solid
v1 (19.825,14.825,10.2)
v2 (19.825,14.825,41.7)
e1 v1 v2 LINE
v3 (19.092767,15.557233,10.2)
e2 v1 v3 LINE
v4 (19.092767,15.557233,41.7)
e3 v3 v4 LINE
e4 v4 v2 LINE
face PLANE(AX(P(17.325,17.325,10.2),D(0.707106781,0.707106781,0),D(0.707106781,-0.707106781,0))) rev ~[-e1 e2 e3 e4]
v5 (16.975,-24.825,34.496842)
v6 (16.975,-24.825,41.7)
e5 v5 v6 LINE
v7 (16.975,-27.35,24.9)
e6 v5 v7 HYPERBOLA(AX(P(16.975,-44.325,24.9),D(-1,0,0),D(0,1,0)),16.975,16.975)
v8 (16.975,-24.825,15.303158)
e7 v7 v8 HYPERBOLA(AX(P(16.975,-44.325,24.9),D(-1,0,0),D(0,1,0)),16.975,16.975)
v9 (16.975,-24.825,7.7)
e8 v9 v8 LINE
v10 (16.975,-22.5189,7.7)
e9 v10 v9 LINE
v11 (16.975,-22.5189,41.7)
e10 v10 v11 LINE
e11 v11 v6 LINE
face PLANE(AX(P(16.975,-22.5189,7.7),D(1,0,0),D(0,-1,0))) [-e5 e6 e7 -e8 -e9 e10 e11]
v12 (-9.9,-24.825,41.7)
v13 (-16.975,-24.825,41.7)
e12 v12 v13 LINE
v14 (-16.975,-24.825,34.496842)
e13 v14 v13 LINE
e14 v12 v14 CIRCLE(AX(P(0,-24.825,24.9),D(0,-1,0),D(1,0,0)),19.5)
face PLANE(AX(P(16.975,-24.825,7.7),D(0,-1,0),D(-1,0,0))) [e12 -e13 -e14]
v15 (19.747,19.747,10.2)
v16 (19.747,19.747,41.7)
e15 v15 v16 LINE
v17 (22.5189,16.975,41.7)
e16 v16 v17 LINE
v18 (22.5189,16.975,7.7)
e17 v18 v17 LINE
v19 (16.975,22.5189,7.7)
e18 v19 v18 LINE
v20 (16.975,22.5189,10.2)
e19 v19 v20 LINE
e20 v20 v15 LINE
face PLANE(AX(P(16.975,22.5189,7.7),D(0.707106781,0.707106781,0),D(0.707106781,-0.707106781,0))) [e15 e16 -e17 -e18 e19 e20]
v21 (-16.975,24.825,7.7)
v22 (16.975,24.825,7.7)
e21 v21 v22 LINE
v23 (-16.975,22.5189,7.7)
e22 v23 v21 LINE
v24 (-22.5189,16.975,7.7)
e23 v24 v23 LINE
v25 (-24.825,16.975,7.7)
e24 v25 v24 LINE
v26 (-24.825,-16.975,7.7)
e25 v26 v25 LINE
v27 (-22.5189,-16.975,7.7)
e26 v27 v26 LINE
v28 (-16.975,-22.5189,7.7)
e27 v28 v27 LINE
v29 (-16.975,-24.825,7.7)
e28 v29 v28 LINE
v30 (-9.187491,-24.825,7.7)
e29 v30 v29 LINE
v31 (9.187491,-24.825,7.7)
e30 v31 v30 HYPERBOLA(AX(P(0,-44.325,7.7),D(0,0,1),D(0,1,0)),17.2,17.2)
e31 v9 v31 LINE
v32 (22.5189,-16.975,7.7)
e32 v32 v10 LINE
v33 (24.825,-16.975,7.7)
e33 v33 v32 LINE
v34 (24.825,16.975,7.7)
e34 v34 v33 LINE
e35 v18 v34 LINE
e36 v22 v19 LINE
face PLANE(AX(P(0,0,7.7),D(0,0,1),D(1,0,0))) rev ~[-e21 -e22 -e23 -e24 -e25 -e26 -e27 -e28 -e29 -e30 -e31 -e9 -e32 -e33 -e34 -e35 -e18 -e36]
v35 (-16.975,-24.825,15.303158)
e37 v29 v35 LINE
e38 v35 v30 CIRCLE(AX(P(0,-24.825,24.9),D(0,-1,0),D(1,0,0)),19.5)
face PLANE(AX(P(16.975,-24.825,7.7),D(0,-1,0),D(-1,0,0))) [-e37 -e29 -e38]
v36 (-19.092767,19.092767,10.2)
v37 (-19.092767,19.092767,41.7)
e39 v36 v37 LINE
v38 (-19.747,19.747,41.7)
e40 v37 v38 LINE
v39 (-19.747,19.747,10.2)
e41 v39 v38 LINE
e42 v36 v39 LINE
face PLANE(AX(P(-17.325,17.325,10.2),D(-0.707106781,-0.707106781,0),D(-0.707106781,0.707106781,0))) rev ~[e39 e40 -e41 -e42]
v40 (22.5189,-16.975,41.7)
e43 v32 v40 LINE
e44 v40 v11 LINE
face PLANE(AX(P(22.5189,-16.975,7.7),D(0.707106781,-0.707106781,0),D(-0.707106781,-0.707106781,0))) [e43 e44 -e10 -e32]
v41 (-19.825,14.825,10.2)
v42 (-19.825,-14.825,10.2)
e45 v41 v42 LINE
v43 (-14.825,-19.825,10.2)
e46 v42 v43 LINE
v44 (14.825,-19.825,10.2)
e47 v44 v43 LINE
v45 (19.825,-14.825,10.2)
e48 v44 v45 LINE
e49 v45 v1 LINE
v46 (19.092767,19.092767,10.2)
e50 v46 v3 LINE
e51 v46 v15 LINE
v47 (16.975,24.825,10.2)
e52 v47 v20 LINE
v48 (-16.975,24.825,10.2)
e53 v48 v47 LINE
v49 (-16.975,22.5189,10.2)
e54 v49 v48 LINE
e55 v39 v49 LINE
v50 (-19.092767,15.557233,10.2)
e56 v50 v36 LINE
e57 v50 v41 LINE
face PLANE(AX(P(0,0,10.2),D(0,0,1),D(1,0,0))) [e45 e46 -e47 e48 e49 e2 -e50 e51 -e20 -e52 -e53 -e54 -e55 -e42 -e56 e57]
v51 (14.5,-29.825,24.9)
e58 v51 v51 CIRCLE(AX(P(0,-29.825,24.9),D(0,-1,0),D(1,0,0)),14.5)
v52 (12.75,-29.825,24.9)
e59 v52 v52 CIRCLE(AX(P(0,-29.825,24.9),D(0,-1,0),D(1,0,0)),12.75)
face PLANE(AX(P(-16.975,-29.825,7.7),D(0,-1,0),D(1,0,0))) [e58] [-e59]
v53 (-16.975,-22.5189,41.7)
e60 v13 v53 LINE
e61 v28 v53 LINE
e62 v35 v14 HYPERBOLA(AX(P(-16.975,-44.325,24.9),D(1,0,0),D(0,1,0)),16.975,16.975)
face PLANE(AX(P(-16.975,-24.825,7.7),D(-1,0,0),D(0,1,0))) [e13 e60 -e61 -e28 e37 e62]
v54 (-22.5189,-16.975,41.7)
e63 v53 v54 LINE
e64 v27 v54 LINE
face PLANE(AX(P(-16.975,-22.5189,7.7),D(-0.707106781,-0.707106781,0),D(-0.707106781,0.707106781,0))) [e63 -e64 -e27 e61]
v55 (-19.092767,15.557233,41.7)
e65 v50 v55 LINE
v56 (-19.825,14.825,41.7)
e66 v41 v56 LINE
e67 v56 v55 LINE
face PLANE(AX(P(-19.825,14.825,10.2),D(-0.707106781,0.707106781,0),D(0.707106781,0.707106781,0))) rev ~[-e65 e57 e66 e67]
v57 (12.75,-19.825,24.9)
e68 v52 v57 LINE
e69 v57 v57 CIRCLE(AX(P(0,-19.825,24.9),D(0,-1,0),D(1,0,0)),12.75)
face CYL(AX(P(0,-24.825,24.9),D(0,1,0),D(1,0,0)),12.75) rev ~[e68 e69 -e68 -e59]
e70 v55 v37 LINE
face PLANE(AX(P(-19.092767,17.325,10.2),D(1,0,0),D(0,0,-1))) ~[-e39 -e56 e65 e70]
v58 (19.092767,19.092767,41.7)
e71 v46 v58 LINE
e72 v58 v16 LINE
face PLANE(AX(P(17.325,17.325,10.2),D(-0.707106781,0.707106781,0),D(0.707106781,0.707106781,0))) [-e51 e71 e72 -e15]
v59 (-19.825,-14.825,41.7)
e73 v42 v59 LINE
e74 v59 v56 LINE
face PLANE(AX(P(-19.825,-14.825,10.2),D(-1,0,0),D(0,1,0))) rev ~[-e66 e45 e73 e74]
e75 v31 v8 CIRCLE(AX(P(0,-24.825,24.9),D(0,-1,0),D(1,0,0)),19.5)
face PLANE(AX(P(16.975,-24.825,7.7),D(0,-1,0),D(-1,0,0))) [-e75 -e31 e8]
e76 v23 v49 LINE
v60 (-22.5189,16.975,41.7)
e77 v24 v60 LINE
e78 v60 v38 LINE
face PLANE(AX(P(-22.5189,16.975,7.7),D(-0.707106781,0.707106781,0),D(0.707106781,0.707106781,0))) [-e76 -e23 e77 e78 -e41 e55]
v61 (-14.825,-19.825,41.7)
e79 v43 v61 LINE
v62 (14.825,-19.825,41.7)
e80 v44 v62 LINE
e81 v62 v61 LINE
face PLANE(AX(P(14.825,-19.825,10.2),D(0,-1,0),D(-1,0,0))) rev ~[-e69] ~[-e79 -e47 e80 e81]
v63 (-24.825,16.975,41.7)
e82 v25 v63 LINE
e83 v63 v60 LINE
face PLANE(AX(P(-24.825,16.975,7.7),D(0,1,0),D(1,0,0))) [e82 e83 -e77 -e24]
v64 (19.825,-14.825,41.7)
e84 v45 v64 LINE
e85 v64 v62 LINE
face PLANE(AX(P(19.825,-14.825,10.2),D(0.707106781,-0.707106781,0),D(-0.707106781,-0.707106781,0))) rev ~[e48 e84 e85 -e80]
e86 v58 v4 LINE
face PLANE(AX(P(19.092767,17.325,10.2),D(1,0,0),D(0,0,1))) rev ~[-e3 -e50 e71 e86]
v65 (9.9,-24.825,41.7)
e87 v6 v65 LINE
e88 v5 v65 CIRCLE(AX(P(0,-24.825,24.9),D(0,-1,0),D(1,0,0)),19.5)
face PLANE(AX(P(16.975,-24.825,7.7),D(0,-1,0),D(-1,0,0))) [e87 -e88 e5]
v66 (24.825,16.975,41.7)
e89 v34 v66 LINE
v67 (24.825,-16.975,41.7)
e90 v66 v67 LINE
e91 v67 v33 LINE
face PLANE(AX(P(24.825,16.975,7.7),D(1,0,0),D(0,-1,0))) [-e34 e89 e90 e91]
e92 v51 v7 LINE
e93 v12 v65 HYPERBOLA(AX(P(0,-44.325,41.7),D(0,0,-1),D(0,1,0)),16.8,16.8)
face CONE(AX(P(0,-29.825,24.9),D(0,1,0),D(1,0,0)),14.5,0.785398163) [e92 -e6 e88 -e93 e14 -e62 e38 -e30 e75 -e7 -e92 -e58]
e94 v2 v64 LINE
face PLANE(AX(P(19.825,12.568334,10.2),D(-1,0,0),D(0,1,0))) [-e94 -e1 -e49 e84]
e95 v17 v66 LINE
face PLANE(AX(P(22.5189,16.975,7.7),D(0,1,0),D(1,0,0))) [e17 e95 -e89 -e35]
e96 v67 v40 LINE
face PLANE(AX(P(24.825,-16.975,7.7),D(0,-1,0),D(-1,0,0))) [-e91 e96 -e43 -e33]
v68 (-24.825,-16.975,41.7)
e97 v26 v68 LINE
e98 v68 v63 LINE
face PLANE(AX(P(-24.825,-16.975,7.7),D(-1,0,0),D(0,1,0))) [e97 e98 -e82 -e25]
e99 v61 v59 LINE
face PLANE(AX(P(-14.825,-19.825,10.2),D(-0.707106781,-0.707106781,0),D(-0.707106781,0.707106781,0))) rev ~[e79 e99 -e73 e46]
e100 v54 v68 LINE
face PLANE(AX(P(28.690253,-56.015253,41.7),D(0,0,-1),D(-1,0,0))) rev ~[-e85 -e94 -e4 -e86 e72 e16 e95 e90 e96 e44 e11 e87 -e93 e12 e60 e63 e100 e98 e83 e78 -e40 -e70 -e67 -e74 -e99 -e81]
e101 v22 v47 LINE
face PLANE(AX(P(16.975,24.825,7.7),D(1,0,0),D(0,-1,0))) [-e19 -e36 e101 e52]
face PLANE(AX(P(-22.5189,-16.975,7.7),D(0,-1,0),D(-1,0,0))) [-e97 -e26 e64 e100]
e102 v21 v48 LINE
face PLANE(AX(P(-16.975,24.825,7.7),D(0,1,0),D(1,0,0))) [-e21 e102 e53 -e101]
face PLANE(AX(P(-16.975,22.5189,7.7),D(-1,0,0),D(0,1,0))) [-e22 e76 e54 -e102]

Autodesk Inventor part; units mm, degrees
ref_plane "YZ Plane" through (0, 0, 0) normal (1, 0, 0) x (0, 1, 0)
ref_plane "XZ Plane" through (0, 0, 0) normal (0, 1, 0) x (-1, 0, 0)
sketch "Sketch1" plane through (0, 0, 0) normal (0, 0, 1) x (1, 0, 0)
  circle A0 centre (-10, 20.9) radius 1.875 projected
  circle A1 centre (-10, -20.9) radius 1.875 projected
  circle A2 centre (10, 20.9) radius 1.875 projected
  circle A3 centre (10, -20.9) radius 1.875 projected
  circle A4 centre (20.8, -14.4) radius 2.075 projected
  circle A5 centre (20.8, 14.4) radius 2.075 projected
  circle A6 centre (-20.8, 14.4) radius 2.075 projected
  circle A7 centre (-20.8, -14.4) radius 2.075 projected
  line L0 (16.9, -16.9) -> (-16.9, -16.9) projected
  line L1 (-16.9, -16.9) -> (-16.9, 16.9) projected
  line L2 (-16.9, 16.9) -> (16.9, 16.9) projected
  line L3 (16.9, 16.9) -> (16.9, -16.9) projected
  line L4 (-17.05, 24.9) -> (-17.05, 22.55) projected
  line L5 (-17.05, 22.55) -> (-22.55, 17.05) projected
  line L6 (-22.55, 17.05) -> (-24.9, 17.05) projected
  line L7 (-24.9, 17.05) -> (-24.9, -17.05) projected
  line L8 (-24.9, -17.05) -> (-22.55, -17.05) projected
  line L9 (-22.55, -17.05) -> (-17.05, -22.55) projected
  line L10 (-17.05, -22.55) -> (-17.05, -24.9) projected
  line L11 (-17.05, -24.9) -> (17.05, -24.9) projected
  line L12 (17.05, -24.9) -> (17.05, -22.55) projected
  line L13 (17.05, -22.55) -> (22.55, -17.05) projected
  line L14 (22.55, -17.05) -> (24.9, -17.05) projected
  line L15 (24.9, -17.05) -> (24.9, 17.05) projected
  line L16 (24.9, 17.05) -> (22.55, 17.05) projected
  line L17 (22.55, 17.05) -> (17.05, 22.55) projected
  line L18 (17.05, 22.55) -> (17.05, 24.9) projected
  line L19 (17.05, 24.9) -> (-17.05, 24.9) projected
  line L20 (24.825, 16.975) -> (24.825, -16.975)
  line L21 (24.825, -16.975) -> (22.5189, -16.975)
  line L22 (22.5189, -16.975) -> (16.975, -22.5189)
  line L23 (16.975, -22.5189) -> (16.975, -24.825)
  line L24 (16.975, -24.825) -> (-16.975, -24.825)
  line L25 (-16.975, -24.825) -> (-16.975, -22.5189)
  line L26 (-16.975, -22.5189) -> (-22.5189, -16.975)
  line L27 (-22.5189, -16.975) -> (-24.825, -16.975)
  line L28 (-24.825, -16.975) -> (-24.825, 16.975)
  line L29 (-24.825, 16.975) -> (-22.5189, 16.975)
  line L30 (-22.5189, 16.975) -> (-16.975, 22.5189)
  line L31 (-16.975, 22.5189) -> (-16.975, 24.825)
  line L32 (-16.975, 24.825) -> (16.975, 24.825)
  line L33 (16.975, 24.825) -> (16.975, 22.5189)
  line L34 (16.975, 22.5189) -> (22.5189, 16.975)
  line L35 (22.5189, 16.975) -> (24.825, 16.975)
  point P0 (0, 0)
  dimension "d0" = 0.075
ref_plane "Work Plane1" through (-24.9, -24.9, 7.7) normal (0, 0, 1) x (1, 0, 0)
extrude "Extrusion1" add sketch "Sketch1" along normal blind 2.5 from surface at 7.7 contours A0 | A1 | A2 | A3 | A4 | A5 | A6 | A7 | L0 L1 L2 L3 | L20 L21 L22 L23 L24 L25 L26 L27 L28 L29 L30 L31 L32 L33 L34 L35
sketch "Sketch2" plane through (0, 0, 0) normal (0, 0, 1) x (1, 0, 0)
  line L0 (22.5189, 16.975) -> (24.825, 16.975) projected
  line L1 (16.975, 22.5189) -> (22.5189, 16.975) projected
  line L2 (16.975, 24.825) -> (16.975, 22.5189) projected
  line L3 (-16.975, 24.825) -> (16.975, 24.825) projected
  line L4 (-16.975, 22.5189) -> (-16.975, 24.825) projected
  line L5 (-22.5189, 16.975) -> (-16.975, 22.5189) projected
  line L6 (-24.825, 16.975) -> (-22.5189, 16.975) projected
  line L7 (-24.825, -16.975) -> (-24.825, 16.975) projected
  line L8 (-22.5189, -16.975) -> (-24.825, -16.975) projected
  line L9 (-16.975, -22.5189) -> (-22.5189, -16.975) projected
  line L10 (-16.975, -24.825) -> (-16.975, -22.5189) projected
  line L11 (16.975, -24.825) -> (-16.975, -24.825) projected
  line L12 (16.975, -22.5189) -> (16.975, -24.825) projected
  line L13 (22.5189, -16.975) -> (16.975, -22.5189) projected
  line L14 (24.825, -16.975) -> (22.5189, -16.975) projected
  line L15 (24.825, 16.975) -> (24.825, -16.975) projected
  line L16 (24.825, -16.975) -> (24.825, -24.825)
  line L17 (24.825, -24.825) -> (16.975, -24.825)
  line L18 (24.825, -24.825) -> (14.825, -24.825)
  line L19 (14.825, -24.825) -> (14.825, -19.825)
  line L20 (19.825, -14.825) -> (24.825, -14.825)
  line L21 (24.825, -14.825) -> (24.825, -24.825)
  line L22 (19.825, -14.825) -> (14.825, -19.825)
  line L23 (14.825, 19.825) -> (19.825, 14.825)
  line L24 (14.825, 19.825) -> (14.825, 24.825)
  line L25 (14.825, 24.825) -> (24.825, 24.825)
  line L26 (24.825, 24.825) -> (24.825, 14.825)
  line L27 (24.825, 14.825) -> (19.825, 14.825)
  line L28 (-19.825, 14.825) -> (-14.825, 19.825)
  line L29 (-19.825, 14.825) -> (-24.825, 14.825)
  line L30 (-24.825, 14.825) -> (-24.825, 24.825)
  line L31 (-24.825, 24.825) -> (-14.825, 24.825)
  line L32 (-14.825, 24.825) -> (-14.825, 19.825)
  line L33 (-14.825, -19.825) -> (-19.825, -14.825)
  line L34 (-14.825, -19.825) -> (-14.825, -24.825)
  line L35 (-14.825, -24.825) -> (-24.825, -24.825)
  line L36 (-24.825, -24.825) -> (-24.825, -14.825)
  line L37 (-24.825, -14.825) -> (-19.825, -14.825)
  line L38 (16.9, -16.9) -> (19.747, -19.747)
  line L39 (-16.9, -16.9) -> (-19.747, -19.747)
  circle A0 centre (20.8, -14.4) radius 2.075 projected
  circle A1 centre (20.8, 14.4) radius 2.075 projected
  circle A2 centre (-20.8, 14.4) radius 2.075 projected
  circle A3 centre (-20.8, -14.4) radius 2.075 projected
  line L40 (16.9, -16.9) -> (-16.9, -16.9) projected
  line L41 (16.9, 16.9) -> (16.9, -16.9) projected
  line L42 (-16.9, 16.9) -> (16.9, 16.9) projected
  line L43 (-16.9, -16.9) -> (-16.9, 16.9) projected
  line L44 (24.875, -22.9) -> (24.875, 22.9) projected
  arc A4 (22.9, -24.875) -> (24.875, -22.9) centre (22.9, -22.9) ccw projected
  line L45 (-22.9, -24.875) -> (22.9, -24.875) projected
  arc A5 (-24.875, -22.9) -> (-22.9, -24.875) centre (-22.9, -22.9) ccw projected
  line L46 (-24.875, 22.9) -> (-24.875, -22.9) projected
  arc A6 (-22.9, 24.875) -> (-24.875, 22.9) centre (-22.9, 22.9) ccw projected
  line L47 (22.9, 24.875) -> (-22.9, 24.875) projected
  arc A7 (24.875, 22.9) -> (22.9, 24.875) centre (22.9, 22.9) ccw projected
  line L48 (16.9, 16.9) -> (19.747, 19.747)
  line L49 (-16.9, 16.9) -> (-19.747, 19.747)
  line L50 (14.825, -19.825) -> (-14.825, -19.825)
  line L51 (19.825, -14.825) -> (19.825, 14.825)
  line L52 (-19.825, -14.825) -> (-19.825, 14.825)
  point P0 (0, 0)
  point P1 (14.825, -14.825)
  point P2 (17.325, -17.325)
  point P3 (-17.325, -17.325)
  point P4 (24.15, -14.825)
  point P5 (22.831, -14.825)
  point P6 (19.0838, -15.5662)
  point P7 (-19.0838, -15.5662)
  point P8 (-22.831, -14.825)
  point P9 (-24.15, -14.825)
  point P10 (-24.15, 14.825)
  point P11 (-22.831, 14.825)
  point P12 (-19.0838, 15.5662)
  point P13 (-14.825, 24.15)
  point P14 (14.825, 24.15)
  point P15 (19.0838, 15.5662)
  point P16 (22.831, 14.825)
  point P17 (24.15, 14.825)
  point P18 (-17.325, 17.325)
  point P19 (17.325, 17.325)
  point P20 (-23.3416, 24.825)
  point P21 (23.3416, 24.825)
  point P22 (-24.825, -23.3416)
  point P23 (-24.825, 23.3416)
  point P24 (23.3416, -24.825)
  point P25 (-23.3416, -24.825)
  point P26 (24.825, -23.3416)
  point P27 (24.825, 23.3416)
  dimension "d3" = 10
  dimension "d4" = 10
  dimension "d5" = 5
  dimension "d6" = 5
  dimension "d9" = 360
extrude "Extrusion2" add sketch "Sketch2" along normal blind 31.5 from surface at 10.2 contours L0 L15 L27 A1 L23 L48 L1 | L15 L20 A0 L51 A1 L27 | L15 L14 L13 L38 L22 A0 L20 | A1 L51 L27 | L27 L23 A1 | A0 L22 L20 | L20 L51 A0 | L38 L13 L12 L11 L19 L22 | L28 A2 L29 L7 L6 L5 L49 | L19 L11 L34 L50 | L39 L9 L8 L7 L37 A3 L33 | L33 L34 L11 L10 L9 L39 | L28 L29 A2 | A3 L37 L33 | L52 A2 L29 | A2 L52 A3 L37 L7 L29 | L37 A3 L52
chamfer "Chamfer1" distance 2.5 angle 45 2 edges at (17.325, 17.325, 25.95) (-17.325, 17.325, 25.95)
sketch "Sketch3" plane through (-16.975, -24.825, 7.7) normal (0, -1, 0) x (1, 0, 0)
  line L0 (-0.075, 0) -> (-0.075, 34.4) projected
  line L1 (34.025, 0) -> (34.025, 34.4) projected
  line L2 (-0.075, 17.2) -> (34.025, 17.2)
  circle A0 centre (16.975, 17.2) radius 12.75
  point P0 (16.975, -7.7)
  dimension "d16" = 25.5
extrude "Extrusion3" cut sketch "Sketch3" against normal up to surface (5 mm away)
sketch "Sketch4" plane through (-16.975, -24.825, 7.7) normal (0, -1, 0) x (1, 0, 0)
  line L0 (33.95, 34) -> (0, 34) projected
  line L1 (0, 0) -> (0, 34) projected
  line L2 (33.95, 0) -> (0, 0) projected
  line L3 (33.95, 0) -> (33.95, 34) projected
  circle A0 centre (16.975, 17.2) radius 14.5
  circle A1 centre (16.975, 17.2) radius 12.75 projected
  point P0 (16.975, -7.7)
  dimension "d25" = 1.75
extrude "Extrusion4" add sketch "Sketch4" along normal blind 5 contours A0
chamfer "Chamfer2" distance 5 angle 45 1 edges at (-14.5, -24.825, 24.9)
equation "\"d6\" = d5"
properties part number "Camera Mount Side"
